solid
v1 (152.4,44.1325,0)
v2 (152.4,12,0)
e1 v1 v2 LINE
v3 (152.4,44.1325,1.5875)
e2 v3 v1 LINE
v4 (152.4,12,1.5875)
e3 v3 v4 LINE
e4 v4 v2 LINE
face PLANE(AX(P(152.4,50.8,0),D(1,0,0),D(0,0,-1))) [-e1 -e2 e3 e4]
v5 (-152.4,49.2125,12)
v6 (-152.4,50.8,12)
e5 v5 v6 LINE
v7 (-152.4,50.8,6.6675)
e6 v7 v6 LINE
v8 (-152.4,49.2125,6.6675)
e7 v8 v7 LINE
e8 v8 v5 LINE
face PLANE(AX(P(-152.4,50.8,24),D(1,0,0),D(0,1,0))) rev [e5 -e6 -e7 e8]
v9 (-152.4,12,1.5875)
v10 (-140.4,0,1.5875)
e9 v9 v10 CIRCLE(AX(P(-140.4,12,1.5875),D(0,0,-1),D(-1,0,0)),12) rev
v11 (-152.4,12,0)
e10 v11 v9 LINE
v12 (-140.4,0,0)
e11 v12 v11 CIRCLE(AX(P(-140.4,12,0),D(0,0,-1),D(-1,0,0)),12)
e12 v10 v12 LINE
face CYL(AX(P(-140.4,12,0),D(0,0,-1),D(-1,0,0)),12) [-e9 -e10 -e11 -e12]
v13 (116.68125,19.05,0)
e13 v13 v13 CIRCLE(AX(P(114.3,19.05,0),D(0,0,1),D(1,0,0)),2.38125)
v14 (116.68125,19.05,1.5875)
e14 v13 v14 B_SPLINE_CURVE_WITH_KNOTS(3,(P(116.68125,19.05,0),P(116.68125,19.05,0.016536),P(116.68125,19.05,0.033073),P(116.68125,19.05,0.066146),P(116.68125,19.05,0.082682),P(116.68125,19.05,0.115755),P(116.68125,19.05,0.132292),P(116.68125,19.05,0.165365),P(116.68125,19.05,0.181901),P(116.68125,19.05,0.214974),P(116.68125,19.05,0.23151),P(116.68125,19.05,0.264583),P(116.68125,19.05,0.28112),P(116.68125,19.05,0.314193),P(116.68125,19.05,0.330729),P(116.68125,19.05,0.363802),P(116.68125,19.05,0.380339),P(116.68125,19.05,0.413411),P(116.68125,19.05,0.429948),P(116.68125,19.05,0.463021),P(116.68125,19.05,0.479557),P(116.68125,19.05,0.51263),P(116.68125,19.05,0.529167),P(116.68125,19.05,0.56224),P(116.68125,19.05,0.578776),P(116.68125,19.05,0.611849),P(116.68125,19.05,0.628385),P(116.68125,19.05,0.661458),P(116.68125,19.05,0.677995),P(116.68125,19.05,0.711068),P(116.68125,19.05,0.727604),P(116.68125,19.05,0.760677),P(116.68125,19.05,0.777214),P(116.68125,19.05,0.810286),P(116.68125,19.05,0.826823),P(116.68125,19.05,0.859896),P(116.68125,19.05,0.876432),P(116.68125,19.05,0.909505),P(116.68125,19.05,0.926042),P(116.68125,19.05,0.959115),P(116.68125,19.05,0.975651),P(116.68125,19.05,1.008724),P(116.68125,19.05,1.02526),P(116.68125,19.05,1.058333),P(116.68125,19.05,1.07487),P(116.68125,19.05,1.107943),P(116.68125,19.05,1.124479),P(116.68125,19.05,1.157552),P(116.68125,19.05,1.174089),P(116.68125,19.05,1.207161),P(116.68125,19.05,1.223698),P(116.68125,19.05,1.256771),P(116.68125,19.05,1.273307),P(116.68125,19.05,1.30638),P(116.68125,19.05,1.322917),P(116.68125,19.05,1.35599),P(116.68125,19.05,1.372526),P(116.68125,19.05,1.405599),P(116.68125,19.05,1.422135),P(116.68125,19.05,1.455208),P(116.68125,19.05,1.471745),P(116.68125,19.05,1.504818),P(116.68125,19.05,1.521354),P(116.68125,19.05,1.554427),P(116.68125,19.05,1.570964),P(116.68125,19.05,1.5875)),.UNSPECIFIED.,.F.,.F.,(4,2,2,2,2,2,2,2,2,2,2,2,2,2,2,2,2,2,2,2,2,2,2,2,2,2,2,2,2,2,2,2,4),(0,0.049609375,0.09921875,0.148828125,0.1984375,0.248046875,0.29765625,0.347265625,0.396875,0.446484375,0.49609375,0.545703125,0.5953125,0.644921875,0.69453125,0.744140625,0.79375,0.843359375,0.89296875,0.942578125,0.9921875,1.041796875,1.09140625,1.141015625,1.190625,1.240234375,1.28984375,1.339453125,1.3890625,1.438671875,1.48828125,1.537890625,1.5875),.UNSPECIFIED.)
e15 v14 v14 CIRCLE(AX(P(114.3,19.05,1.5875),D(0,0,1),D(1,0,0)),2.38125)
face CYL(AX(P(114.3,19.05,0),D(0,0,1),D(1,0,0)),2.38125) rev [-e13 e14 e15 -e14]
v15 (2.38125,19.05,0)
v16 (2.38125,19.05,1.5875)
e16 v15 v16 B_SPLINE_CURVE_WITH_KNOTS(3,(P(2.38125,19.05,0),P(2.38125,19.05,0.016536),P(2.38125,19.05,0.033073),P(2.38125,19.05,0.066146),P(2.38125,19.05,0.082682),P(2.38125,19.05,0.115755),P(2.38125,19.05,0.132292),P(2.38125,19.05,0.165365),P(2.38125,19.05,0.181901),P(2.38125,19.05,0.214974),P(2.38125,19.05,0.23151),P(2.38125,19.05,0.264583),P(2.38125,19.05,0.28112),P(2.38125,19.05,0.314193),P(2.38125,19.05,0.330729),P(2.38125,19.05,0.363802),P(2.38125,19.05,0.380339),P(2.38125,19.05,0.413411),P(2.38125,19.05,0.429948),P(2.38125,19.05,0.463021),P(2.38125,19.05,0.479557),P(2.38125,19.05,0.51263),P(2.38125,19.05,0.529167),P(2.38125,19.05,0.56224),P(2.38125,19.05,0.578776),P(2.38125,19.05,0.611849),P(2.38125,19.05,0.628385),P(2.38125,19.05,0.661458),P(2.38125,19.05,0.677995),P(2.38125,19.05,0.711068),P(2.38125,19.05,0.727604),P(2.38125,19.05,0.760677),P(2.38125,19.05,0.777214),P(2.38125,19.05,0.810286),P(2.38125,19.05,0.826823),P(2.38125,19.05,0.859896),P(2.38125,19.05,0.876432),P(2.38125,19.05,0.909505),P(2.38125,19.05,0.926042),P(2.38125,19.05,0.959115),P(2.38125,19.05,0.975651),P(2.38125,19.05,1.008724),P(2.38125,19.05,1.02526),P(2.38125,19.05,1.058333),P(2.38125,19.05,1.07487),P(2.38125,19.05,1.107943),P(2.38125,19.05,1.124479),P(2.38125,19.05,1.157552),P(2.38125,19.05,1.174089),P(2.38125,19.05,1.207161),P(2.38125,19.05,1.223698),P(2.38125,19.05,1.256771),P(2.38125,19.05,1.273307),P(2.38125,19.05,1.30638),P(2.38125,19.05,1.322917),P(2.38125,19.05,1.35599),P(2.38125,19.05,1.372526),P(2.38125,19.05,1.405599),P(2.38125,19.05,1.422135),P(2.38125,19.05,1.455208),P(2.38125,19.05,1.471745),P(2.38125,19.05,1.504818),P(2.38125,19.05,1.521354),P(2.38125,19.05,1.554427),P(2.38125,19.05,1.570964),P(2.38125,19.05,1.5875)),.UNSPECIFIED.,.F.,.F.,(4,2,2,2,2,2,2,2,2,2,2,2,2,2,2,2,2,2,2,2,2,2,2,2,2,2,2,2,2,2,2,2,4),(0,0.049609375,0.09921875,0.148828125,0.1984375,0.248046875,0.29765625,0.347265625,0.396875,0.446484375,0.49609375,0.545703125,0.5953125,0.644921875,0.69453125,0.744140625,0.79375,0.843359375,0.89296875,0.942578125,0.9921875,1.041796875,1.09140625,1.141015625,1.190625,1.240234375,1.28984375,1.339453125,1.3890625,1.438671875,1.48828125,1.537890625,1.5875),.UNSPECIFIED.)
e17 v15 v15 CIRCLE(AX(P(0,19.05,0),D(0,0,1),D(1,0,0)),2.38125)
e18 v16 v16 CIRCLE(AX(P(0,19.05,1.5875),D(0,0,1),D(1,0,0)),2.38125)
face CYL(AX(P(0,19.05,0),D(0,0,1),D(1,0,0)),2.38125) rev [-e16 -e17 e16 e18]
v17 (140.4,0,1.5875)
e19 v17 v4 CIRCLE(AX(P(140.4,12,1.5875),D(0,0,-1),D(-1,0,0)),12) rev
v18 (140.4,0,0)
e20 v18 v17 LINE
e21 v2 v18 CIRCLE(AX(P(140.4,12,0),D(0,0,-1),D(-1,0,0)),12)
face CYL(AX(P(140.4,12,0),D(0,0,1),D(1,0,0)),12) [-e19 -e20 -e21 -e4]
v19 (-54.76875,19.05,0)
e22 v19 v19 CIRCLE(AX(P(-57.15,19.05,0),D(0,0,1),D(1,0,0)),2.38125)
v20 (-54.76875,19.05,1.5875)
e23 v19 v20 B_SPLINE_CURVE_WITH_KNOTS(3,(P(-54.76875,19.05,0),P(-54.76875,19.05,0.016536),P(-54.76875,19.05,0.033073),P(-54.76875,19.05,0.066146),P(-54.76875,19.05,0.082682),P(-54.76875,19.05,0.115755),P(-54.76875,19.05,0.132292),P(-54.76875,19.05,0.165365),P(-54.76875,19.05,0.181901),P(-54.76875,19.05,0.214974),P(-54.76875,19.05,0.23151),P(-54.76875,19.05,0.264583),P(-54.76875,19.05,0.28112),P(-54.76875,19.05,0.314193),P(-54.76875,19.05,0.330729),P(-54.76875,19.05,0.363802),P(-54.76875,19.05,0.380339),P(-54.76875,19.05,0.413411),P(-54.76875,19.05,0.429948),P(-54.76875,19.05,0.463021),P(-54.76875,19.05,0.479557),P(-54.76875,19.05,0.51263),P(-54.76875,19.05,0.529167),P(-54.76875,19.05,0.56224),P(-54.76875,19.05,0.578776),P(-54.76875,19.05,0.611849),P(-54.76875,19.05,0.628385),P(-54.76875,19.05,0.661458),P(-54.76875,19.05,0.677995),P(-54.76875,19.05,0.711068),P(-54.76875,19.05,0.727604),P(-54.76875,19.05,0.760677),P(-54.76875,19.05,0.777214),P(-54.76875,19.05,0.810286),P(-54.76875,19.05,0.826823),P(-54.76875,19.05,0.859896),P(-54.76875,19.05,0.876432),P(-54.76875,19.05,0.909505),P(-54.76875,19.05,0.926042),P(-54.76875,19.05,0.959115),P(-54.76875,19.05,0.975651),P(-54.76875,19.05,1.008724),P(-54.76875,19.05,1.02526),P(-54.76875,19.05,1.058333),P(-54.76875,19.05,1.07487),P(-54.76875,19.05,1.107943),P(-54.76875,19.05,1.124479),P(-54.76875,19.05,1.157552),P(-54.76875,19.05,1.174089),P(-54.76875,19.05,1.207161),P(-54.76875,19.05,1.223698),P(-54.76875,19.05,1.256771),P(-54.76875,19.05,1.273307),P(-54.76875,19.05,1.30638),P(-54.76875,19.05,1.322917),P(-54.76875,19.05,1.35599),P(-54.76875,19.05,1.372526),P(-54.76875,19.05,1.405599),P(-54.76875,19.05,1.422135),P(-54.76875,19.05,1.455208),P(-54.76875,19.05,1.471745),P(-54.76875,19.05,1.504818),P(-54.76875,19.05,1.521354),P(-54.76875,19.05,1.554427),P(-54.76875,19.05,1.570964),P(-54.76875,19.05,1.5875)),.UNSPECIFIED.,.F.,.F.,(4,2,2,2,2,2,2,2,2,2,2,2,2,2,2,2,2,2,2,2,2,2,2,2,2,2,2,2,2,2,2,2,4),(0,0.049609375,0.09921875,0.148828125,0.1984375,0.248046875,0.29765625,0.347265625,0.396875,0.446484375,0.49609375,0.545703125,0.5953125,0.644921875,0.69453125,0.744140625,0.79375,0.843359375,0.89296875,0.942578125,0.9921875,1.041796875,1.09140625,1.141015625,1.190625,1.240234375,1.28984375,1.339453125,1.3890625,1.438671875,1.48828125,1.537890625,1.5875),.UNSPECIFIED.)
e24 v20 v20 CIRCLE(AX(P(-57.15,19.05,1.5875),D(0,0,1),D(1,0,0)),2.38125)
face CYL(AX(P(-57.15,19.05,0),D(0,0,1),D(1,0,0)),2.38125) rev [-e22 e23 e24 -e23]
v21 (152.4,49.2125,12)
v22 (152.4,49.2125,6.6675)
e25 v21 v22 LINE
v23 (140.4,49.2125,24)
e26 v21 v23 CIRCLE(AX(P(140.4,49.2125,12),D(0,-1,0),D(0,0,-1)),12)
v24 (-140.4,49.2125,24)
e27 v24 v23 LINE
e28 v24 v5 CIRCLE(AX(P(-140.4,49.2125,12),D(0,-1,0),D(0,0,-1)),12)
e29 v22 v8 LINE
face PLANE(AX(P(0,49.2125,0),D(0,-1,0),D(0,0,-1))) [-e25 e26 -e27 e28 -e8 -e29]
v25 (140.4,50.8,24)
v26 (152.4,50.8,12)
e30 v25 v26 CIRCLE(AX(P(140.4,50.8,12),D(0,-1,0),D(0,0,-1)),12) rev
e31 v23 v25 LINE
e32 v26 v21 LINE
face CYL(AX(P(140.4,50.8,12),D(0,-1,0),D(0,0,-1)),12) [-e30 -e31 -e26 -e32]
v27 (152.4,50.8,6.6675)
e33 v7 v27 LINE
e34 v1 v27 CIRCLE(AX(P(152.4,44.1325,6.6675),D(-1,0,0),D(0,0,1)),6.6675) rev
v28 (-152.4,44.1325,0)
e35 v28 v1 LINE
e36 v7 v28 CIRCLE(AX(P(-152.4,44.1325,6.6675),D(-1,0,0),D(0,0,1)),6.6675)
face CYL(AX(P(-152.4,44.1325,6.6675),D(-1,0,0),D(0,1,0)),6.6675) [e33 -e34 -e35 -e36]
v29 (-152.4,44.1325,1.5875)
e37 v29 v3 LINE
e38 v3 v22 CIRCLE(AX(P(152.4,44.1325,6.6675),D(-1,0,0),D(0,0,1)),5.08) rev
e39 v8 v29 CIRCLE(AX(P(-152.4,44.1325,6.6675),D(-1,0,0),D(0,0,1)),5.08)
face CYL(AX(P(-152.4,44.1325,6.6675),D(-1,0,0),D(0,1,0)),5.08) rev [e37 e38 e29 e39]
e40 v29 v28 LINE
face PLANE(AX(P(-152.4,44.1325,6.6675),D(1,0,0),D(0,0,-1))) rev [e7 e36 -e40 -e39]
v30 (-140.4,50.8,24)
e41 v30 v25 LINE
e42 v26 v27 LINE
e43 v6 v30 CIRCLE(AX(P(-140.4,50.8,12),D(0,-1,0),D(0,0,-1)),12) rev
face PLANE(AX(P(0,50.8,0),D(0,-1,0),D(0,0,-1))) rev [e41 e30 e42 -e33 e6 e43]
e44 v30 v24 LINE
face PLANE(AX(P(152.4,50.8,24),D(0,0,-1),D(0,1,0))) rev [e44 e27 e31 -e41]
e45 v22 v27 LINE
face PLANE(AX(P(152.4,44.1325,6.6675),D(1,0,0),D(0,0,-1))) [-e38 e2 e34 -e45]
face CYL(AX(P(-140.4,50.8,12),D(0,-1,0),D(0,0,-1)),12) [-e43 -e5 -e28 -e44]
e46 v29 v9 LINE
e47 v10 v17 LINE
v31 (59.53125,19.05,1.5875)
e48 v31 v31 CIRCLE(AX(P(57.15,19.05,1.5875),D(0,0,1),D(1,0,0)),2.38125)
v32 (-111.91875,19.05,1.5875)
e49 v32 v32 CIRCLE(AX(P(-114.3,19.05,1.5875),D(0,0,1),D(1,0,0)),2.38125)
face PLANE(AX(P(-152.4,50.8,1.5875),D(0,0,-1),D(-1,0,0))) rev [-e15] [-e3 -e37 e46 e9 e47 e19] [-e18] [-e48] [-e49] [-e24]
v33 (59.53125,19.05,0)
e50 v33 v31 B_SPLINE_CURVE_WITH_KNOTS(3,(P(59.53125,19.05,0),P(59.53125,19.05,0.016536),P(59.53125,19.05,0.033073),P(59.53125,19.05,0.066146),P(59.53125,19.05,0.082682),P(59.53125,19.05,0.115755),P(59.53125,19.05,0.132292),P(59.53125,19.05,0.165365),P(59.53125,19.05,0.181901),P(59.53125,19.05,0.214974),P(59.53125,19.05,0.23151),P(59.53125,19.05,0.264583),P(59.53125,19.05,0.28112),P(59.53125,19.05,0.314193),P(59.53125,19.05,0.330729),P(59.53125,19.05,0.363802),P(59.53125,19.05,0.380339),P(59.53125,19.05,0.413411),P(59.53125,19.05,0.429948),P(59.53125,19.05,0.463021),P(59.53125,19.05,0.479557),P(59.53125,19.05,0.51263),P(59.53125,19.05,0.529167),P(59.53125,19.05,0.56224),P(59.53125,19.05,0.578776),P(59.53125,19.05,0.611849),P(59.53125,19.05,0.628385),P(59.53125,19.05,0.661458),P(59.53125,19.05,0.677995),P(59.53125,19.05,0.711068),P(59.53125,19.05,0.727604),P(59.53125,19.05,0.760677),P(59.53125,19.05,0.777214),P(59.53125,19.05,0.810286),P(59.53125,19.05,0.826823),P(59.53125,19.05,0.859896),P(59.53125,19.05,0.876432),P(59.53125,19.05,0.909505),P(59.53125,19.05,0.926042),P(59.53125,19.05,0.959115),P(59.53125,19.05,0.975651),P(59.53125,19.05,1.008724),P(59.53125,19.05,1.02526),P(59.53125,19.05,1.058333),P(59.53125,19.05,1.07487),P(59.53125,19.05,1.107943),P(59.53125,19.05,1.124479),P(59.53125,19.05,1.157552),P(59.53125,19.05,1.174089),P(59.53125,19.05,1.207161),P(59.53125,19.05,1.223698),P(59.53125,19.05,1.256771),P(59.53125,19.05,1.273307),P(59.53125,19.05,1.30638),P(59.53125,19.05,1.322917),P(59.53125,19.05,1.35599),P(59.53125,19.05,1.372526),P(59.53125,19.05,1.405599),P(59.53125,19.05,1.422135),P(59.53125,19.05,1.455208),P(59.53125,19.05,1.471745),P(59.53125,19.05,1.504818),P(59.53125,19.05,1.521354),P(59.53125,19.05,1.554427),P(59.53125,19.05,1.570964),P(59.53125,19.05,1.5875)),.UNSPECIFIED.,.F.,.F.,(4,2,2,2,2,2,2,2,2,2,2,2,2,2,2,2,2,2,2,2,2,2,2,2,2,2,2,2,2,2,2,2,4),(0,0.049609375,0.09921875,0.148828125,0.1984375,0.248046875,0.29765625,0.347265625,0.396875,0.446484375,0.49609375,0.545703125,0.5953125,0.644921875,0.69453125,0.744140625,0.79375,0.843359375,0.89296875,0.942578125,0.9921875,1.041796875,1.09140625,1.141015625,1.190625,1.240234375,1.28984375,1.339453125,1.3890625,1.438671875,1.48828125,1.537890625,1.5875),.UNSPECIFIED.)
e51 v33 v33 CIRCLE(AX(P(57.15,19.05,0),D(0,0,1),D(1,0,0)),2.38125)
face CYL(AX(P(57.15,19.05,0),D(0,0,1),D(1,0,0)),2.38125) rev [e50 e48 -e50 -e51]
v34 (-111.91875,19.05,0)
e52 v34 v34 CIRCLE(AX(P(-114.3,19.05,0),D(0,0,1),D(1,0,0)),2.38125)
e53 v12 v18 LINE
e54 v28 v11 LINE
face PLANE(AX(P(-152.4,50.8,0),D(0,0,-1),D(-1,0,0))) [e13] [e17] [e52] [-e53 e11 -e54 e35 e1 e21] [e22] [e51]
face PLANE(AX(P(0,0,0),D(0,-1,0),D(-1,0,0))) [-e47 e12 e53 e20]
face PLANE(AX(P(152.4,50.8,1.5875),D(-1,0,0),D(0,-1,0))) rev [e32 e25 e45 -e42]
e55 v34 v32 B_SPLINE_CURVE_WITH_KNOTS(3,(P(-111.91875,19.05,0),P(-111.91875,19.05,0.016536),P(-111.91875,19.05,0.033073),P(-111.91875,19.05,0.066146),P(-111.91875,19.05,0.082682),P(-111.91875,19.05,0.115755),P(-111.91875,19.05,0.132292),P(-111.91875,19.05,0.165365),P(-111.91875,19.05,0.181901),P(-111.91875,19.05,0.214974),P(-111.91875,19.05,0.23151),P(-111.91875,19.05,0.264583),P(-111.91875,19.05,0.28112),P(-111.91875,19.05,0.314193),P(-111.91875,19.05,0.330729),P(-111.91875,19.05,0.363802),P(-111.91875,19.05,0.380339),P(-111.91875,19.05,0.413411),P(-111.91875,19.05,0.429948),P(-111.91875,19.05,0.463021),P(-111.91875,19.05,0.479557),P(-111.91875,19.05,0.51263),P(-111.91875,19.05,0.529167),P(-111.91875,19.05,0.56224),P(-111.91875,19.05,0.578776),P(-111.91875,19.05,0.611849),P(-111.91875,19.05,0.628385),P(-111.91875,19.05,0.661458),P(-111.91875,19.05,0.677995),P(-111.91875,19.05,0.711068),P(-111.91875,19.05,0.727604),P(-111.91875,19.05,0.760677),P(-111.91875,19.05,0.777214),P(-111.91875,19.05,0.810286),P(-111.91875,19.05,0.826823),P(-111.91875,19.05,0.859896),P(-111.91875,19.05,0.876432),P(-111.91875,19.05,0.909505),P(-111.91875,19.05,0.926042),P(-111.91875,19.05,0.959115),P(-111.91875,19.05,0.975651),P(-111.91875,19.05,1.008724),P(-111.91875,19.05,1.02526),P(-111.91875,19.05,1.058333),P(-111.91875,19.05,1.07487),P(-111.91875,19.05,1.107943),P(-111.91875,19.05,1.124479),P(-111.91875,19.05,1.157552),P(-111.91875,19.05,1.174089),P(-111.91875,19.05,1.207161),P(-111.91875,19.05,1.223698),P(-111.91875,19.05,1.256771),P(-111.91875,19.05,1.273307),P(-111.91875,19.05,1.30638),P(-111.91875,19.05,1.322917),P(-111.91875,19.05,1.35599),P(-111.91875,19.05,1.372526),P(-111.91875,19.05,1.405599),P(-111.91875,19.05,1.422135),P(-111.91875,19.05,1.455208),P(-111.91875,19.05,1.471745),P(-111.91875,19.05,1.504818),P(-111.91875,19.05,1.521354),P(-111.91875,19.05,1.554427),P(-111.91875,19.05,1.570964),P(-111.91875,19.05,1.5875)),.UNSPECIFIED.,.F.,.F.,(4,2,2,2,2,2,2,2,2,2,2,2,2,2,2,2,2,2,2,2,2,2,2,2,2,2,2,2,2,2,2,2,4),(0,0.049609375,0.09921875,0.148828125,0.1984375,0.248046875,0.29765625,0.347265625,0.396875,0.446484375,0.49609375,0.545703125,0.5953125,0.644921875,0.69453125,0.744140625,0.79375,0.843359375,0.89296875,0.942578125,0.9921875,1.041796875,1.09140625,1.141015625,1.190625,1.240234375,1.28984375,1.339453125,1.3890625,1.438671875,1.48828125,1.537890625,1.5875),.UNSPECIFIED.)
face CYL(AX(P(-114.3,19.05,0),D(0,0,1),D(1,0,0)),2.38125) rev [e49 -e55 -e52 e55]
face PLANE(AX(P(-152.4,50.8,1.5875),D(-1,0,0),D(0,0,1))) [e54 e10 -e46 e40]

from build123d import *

# Parameters (mm, degrees)
SKETCH1_W                    = 304.8
SKETCH1_H                    = 1.5875
BASE_FLANGE1_DEPTH           = 50.8
EDGE_FLANGE1_STRIP_W         = 16.51
EDGE_FLANGE1_STRIP_H         = 1.5875
EDGE_FLANGE1_STRIP_CUT_DEPTH = 304.8
EDGE_FLANGE1_DEPTH           = 304.8
SKETCH10_R                   = 2.38125
CUT_EXTRUDE1_DEPTH           = 163.199630568
FILLET1_R                    = 12


# Sheet-metal steps are written as plain solids
with BuildPart() as part:
    # Sketch1 → Base-Flange1 (new body)
    with BuildSketch(Plane(origin=(0, 0, 0), x_dir=(1, 0, 0), z_dir=(0, 1, 0))):
        with Locations((0, -0.79375)):
            Rectangle(SKETCH1_W, SKETCH1_H)
    extrude(amount=BASE_FLANGE1_DEPTH)

    # Edge-Flange1 strip (across the edge) → Edge-Flange1 strip cut (cut)
    with BuildSketch(Plane(origin=(152.4, 50.8, 1.5875), x_dir=(0, -1, 0), z_dir=(-1, 0, 0))):
        with Locations((-1.5875, -0.79375)):
            Rectangle(EDGE_FLANGE1_STRIP_W, EDGE_FLANGE1_STRIP_H)
    extrude(amount=EDGE_FLANGE1_STRIP_CUT_DEPTH, mode=Mode.SUBTRACT)

    # Edge-Flange1 section (across the edge) → Edge-Flange1 (add)
    with BuildSketch(Plane(origin=(152.4, 50.8, 1.5875), x_dir=(0, -1, 0), z_dir=(-1, 0, 0))):
        with BuildLine():
            Line((0, 5.08), (0, 22.4125))
            Line((0, 22.4125), (1.5875, 22.4125))
            Line((1.5875, 22.4125), (1.5875, 5.08))
            ThreePointArc((1.5875, 5.08), (3.075397552, 1.487897552), (6.6675, 0))
            Line((6.6675, 0), (6.6675, -1.5875))
            ThreePointArc((6.6675, -1.5875), (1.952865536, 0.365365536), (0, 5.08))
        make_face()
    extrude(amount=EDGE_FLANGE1_DEPTH)

    # Sketch10 → Cut-Extrude1 (cut, through all)
    with BuildSketch(Plane.XY.offset(1.5875)):
        with Locations((-114.3, 19.05)):
            Circle(SKETCH10_R)
        with Locations((114.3, 19.05)):
            Circle(SKETCH10_R)
        with Locations((0, 19.05)):
            Circle(SKETCH10_R)
        with Locations((57.15, 19.05)):
            Circle(SKETCH10_R)
        with Locations((-57.15, 19.05)):
            Circle(SKETCH10_R)
    extrude(amount=-CUT_EXTRUDE1_DEPTH, mode=Mode.SUBTRACT)

    # Fillet1
    fillet1_edges = [part.edges().sort_by_distance(p)[0] for p in [
        (152.4, 50.00625, 24),
        (-152.4, 50.00625, 24),
        (-152.4, 0, 0.79375),
        (152.4, 0, 0.79375),
    ]]
    fillet(fillet1_edges, radius=FILLET1_R)


solid = part.part
